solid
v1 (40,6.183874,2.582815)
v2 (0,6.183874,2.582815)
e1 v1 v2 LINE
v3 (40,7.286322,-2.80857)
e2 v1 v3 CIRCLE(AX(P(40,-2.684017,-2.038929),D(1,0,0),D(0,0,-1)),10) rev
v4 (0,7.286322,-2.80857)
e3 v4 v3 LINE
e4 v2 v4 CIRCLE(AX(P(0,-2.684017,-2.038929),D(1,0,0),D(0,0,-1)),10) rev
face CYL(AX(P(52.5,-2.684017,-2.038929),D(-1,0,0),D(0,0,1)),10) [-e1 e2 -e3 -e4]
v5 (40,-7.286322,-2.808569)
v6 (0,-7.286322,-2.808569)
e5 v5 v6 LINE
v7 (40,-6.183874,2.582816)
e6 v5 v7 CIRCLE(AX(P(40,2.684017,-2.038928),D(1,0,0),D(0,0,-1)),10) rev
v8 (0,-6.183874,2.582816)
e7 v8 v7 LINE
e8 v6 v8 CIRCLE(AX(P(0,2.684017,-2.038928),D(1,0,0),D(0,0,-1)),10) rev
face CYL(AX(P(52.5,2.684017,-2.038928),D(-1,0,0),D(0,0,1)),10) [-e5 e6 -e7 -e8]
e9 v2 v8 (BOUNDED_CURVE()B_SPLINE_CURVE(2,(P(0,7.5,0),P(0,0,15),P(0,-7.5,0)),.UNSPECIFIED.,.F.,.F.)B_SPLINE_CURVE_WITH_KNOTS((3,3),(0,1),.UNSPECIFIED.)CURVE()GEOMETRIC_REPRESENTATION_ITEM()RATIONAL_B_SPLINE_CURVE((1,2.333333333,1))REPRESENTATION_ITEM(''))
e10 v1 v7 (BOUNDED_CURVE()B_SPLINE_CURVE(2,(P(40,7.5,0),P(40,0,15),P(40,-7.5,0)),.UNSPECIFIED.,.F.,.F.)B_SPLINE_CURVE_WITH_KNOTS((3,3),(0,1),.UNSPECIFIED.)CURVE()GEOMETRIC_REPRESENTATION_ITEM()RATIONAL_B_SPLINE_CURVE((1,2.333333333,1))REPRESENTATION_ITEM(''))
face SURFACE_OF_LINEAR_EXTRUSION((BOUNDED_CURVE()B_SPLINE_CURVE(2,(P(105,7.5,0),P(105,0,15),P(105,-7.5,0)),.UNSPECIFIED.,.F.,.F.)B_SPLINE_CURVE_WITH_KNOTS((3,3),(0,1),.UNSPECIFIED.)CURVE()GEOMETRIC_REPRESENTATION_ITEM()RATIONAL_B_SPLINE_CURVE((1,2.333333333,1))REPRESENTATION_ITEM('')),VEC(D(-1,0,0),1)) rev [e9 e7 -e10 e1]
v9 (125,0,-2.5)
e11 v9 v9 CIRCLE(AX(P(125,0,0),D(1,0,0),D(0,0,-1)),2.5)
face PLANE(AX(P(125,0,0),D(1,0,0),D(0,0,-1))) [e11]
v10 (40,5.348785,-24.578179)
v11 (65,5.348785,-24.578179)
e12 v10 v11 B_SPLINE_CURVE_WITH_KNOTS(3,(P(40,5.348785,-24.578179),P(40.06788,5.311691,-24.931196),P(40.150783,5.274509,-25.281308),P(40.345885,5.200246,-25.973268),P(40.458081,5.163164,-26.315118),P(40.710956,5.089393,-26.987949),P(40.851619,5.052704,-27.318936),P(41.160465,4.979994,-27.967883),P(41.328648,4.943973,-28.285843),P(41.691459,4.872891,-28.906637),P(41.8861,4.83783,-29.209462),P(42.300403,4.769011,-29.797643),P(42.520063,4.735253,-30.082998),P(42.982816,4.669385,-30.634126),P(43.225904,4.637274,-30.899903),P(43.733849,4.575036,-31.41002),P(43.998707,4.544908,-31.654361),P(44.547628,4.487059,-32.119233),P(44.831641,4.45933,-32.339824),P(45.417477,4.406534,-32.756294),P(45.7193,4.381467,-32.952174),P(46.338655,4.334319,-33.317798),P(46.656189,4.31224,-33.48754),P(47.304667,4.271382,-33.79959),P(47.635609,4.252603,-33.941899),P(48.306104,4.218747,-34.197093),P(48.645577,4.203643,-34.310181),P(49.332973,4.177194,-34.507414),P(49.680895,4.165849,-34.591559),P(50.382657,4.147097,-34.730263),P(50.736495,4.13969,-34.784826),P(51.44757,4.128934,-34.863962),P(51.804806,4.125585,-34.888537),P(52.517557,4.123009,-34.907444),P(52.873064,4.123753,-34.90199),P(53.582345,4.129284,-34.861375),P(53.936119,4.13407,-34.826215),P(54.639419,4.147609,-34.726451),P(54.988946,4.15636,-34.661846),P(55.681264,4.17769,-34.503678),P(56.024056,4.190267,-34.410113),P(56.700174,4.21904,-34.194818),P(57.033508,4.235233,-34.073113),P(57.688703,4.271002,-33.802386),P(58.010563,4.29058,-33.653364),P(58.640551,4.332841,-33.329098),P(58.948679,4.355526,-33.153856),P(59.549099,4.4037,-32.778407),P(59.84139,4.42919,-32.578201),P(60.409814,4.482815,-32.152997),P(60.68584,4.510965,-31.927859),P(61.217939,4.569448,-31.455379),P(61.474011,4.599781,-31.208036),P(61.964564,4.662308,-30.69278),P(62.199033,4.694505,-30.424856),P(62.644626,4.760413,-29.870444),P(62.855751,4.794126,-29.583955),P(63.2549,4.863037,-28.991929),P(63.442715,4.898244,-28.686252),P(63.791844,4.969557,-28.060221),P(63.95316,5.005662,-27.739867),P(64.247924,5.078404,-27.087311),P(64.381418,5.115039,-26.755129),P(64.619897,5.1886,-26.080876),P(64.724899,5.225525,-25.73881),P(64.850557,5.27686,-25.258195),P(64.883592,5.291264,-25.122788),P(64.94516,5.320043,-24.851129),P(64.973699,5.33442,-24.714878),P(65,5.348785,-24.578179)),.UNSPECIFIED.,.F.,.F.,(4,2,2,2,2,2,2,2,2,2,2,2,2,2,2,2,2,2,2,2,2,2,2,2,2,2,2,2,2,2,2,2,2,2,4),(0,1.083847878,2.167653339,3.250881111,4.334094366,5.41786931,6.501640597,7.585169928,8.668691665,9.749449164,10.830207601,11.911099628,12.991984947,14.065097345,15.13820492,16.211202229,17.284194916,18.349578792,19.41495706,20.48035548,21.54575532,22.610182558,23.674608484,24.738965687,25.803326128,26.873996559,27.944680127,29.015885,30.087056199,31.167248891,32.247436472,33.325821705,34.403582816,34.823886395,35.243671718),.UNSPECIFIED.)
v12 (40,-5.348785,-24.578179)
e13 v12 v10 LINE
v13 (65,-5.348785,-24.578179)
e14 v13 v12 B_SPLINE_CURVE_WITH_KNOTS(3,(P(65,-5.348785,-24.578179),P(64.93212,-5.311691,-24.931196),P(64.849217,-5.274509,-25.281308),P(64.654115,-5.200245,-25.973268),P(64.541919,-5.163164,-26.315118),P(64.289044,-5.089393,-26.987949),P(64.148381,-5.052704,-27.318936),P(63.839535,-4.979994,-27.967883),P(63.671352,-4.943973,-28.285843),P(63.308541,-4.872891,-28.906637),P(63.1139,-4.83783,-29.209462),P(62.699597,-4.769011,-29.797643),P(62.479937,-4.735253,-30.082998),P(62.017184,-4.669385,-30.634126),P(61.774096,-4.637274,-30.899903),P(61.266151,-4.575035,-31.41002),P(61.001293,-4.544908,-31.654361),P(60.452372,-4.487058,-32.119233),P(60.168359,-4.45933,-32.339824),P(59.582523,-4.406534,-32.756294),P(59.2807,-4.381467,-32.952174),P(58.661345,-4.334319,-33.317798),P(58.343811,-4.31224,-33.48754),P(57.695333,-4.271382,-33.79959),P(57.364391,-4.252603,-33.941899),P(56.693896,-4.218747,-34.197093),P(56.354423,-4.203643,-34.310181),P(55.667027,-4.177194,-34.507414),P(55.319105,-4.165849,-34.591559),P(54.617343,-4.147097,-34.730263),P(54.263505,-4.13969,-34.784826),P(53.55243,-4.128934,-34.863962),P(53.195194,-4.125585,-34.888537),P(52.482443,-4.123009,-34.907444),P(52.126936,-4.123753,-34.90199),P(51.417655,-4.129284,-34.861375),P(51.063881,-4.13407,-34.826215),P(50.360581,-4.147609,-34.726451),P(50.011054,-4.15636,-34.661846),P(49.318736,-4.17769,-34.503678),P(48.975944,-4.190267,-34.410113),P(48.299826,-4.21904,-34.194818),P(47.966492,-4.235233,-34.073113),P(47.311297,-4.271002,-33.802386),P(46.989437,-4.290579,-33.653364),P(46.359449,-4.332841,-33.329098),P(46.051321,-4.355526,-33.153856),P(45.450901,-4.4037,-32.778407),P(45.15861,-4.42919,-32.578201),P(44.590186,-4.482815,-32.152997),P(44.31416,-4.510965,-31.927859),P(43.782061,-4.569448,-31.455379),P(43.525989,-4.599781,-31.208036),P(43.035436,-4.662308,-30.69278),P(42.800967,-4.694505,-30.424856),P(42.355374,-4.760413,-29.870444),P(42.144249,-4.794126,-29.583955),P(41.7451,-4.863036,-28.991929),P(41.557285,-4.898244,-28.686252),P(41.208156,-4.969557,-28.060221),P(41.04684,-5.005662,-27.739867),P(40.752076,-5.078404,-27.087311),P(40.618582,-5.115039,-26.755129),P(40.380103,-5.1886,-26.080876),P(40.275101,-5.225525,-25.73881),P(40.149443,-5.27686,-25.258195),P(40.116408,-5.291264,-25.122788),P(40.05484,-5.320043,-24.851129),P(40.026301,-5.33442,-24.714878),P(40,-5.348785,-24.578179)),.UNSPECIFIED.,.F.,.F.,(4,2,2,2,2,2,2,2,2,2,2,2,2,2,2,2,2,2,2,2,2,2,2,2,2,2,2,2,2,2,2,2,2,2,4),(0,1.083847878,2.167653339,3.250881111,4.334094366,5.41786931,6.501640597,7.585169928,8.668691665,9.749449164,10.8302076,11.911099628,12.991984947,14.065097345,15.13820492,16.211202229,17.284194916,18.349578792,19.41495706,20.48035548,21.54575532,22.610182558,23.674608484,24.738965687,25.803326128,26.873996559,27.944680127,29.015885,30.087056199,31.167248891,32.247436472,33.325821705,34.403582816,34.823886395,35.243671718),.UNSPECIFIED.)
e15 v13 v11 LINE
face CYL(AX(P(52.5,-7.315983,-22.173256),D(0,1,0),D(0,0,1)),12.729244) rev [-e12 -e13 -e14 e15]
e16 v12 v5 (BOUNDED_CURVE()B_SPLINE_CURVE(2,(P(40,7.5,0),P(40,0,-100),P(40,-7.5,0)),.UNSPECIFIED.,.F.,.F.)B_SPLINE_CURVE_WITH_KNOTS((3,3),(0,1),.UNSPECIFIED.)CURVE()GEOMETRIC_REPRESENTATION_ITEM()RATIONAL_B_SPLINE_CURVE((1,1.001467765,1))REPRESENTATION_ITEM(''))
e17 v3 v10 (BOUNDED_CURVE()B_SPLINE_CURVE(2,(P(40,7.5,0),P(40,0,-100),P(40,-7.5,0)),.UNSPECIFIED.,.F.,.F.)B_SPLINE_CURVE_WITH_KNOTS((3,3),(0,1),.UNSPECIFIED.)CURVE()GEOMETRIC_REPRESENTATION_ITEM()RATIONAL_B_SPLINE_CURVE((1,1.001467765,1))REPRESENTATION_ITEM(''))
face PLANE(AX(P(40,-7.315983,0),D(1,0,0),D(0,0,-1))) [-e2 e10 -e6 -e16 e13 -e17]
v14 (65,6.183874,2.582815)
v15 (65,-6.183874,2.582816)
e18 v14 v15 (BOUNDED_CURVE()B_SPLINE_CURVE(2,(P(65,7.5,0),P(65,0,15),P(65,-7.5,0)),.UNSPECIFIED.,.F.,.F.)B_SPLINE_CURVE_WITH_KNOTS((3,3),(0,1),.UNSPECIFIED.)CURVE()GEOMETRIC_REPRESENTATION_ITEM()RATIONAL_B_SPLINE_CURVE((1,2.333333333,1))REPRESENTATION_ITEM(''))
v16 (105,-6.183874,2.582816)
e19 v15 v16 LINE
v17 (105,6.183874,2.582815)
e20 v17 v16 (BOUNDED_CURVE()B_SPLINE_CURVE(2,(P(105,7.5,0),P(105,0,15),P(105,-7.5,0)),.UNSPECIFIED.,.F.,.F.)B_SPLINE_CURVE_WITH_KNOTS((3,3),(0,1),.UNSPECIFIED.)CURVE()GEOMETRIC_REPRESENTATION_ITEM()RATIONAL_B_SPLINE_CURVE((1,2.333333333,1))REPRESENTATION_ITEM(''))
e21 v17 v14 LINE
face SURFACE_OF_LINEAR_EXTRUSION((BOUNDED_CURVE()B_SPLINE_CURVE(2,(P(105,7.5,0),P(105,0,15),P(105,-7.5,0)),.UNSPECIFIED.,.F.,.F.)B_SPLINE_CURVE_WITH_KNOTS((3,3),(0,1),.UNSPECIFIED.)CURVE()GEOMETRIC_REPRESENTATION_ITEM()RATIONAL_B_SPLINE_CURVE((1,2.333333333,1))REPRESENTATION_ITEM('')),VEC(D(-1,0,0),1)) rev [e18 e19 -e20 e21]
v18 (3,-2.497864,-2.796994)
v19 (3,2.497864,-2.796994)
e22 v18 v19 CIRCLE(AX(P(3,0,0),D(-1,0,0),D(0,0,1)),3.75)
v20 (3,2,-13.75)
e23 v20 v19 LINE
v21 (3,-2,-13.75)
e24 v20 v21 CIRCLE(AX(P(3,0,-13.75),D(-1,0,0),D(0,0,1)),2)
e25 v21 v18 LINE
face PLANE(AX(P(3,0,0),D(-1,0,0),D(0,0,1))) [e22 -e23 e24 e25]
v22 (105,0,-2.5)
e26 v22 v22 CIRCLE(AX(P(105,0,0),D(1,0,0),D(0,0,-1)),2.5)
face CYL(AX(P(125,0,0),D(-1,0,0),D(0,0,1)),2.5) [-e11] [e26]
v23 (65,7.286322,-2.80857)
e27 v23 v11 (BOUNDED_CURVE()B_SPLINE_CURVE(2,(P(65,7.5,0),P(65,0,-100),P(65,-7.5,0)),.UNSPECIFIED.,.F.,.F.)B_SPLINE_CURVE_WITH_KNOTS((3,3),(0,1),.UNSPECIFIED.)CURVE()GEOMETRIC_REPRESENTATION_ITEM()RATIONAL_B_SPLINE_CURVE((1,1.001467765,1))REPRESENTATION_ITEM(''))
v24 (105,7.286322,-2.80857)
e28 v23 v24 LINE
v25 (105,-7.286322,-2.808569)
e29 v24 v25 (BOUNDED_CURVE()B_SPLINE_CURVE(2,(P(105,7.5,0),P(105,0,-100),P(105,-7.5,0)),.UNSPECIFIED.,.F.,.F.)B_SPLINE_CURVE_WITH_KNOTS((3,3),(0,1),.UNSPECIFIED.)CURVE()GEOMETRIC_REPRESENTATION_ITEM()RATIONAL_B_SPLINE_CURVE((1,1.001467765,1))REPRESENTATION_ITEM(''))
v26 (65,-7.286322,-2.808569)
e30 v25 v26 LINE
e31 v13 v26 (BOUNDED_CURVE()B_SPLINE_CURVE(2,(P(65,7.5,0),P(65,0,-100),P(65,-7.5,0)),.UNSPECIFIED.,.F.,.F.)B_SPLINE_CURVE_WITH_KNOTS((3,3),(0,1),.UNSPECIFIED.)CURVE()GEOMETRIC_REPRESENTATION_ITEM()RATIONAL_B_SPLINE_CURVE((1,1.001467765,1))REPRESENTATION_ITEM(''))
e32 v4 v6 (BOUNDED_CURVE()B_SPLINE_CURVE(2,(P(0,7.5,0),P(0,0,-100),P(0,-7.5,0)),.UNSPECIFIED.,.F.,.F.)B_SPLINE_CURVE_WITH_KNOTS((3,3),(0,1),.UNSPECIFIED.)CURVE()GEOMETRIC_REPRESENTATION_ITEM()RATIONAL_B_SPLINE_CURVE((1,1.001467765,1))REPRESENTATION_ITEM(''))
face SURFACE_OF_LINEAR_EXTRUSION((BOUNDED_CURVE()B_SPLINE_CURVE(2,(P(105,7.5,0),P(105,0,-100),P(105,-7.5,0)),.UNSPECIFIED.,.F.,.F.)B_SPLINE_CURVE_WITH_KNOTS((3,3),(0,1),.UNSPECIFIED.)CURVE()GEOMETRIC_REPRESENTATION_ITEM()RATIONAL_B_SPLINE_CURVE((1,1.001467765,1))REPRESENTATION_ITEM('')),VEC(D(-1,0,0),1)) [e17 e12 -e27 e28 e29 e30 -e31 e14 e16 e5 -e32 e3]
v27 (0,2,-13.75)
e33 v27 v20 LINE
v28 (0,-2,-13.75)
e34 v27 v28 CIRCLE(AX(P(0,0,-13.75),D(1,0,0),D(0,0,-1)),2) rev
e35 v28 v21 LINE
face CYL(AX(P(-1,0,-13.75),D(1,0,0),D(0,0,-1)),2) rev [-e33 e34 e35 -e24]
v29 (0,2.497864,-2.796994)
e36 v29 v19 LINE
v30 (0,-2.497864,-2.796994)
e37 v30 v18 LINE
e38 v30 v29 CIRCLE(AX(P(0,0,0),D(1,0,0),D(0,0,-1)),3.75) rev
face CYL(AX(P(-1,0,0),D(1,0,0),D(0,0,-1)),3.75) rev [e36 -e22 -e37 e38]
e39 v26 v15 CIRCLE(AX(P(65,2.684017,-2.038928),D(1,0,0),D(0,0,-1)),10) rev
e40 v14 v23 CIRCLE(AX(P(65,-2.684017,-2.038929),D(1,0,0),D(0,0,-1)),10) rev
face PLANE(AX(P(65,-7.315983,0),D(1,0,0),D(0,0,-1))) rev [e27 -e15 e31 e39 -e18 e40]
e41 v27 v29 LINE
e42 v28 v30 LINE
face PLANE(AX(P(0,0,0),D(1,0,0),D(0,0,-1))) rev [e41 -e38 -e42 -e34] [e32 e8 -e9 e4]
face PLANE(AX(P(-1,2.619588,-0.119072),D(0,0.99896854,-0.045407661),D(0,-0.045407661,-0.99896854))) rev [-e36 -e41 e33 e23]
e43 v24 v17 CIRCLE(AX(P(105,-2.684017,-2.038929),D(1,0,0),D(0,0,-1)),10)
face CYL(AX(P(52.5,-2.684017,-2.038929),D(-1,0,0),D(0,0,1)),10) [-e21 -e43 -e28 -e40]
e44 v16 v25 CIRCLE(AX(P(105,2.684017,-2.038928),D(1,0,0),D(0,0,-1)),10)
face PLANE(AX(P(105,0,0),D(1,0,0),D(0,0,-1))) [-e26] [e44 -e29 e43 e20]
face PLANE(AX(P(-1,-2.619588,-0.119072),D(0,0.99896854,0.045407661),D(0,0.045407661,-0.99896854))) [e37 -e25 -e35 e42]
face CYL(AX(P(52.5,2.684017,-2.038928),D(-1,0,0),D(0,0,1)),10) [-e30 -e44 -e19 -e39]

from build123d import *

# Parameters (mm, degrees)
SKETCH1_R               = 1.5
BOSS_EXTRUDE1_DEPTH     = 105
FILLET1_R               = 10
CUT_EXTRUDE1_DEPTH      = 117.542660484
CUT_EXTRUDE1_DEPTH_BACK = 117.542660484
CAVITY1_DEPTH           = 3
SKETCH3_R               = 2.5
SKETCH3_R_2             = 1.5
BOSS_EXTRUDE2_DEPTH     = 20
SKETCH5_R               = 1.5
BOSS_EXTRUDE4_DEPTH     = 37
BOSS_EXTRUDE5_START     = -62
SKETCH5_2_R             = 1.5
BOSS_EXTRUDE5_DEPTH     = 40


# Read off the part's stored shape, not the designer's step: Cavity1
with BuildPart() as part:
    # Sketch1 → Boss-Extrude1 (new body)
    with BuildSketch(Plane(origin=(0, 0, 0), x_dir=(0, 0, -1), z_dir=(1, 0, 0))):
        with BuildLine():
            add(Edge.make_bspline(
                [(3.73e-07, 7.5), (-15, 0), (-3.73e-07, -7.5)],
                knots=[0, 0, 0, 1, 1, 1], degree=2, weights=[1, 2.333333333, 1]))
            add(Edge.make_bspline(
                [(3.73e-07, 7.5), (100, 0), (-3.73e-07, -7.5)],
                knots=[0, 0, 0, 1, 1, 1], degree=2, weights=[1, 1.001467765, 1]))
        make_face()
        Circle(SKETCH1_R, mode=Mode.SUBTRACT)
    extrude(amount=BOSS_EXTRUDE1_DEPTH)

    # Fillet1
    fillet1_edges = [part.edges().sort_by_distance(p)[0] for p in [
        (52.5, -7.5, 3.73e-07),
        (52.5, 7.5, -3.73e-07),
    ]]
    fillet(fillet1_edges, radius=FILLET1_R)

    # Sketch2 → Cut-Extrude1 (cut, two sides: drawn at the far end of the back side and taken through both)
    with BuildSketch(Plane(origin=(0, 0, 0), x_dir=(1, 0, 0), z_dir=(0, 1, 0)).offset(-CUT_EXTRUDE1_DEPTH_BACK)):
        with BuildLine():
            Line((65, 19.76833361), (65, 24.578179161))
            ThreePointArc((65, 24.578179161), (52.5, 34.902500415), (40, 24.578179161))
            Line((40, 24.578179161), (40, 19.76833361))
            Line((40, 19.76833361), (40, 14.958488059))
            ThreePointArc((40, 14.958488059), (52.5, 4.634166805), (65, 14.958488059))
            Line((65, 14.958488059), (65, 19.76833361))
        make_face()
        with BuildLine():
            Line((40, -10.5), (65, -10.5))
            Line((65, -10.5), (65, 14.958488059))
            ThreePointArc((65, 14.958488059), (52.5, 4.634166805), (40, 14.958488059))
            Line((40, 14.958488059), (40, -10.5))
        make_face()
    extrude(amount=CUT_EXTRUDE1_DEPTH + CUT_EXTRUDE1_DEPTH_BACK, mode=Mode.SUBTRACT)

    # Cavity1 outline → Cavity1 (cut)
    with BuildSketch(Plane.YZ):
        with BuildLine():
            ThreePointArc((-2, -13.75), (0, -15.75), (2, -13.75))
            Line((2, -13.75), (2.497863905, -2.796994085))
            ThreePointArc((2.497863905, -2.796994085), (0, 3.75), (-2.497863905, -2.796994085))
            Line((-2.497863905, -2.796994085), (-2, -13.75))
        make_face()
    extrude(amount=CAVITY1_DEPTH, mode=Mode.SUBTRACT)

    # Sketch3 → Boss-Extrude2 (add)
    # profile 1 of 2: a face of its own
    with BuildSketch(Plane(origin=(105, 0, 0), x_dir=(0, 0, -1), z_dir=(1, 0, 0))):
        Circle(SKETCH3_R)
        with Locations(Location((0, 0, 0), (0, 0, 180))):
            Circle(SKETCH3_R_2, mode=Mode.SUBTRACT)
    # profile 2 of 2: a face of its own
    with BuildSketch(Plane(origin=(105, 0, 0), x_dir=(0, 0, -1), z_dir=(1, 0, 0))):
        with Locations(Location((0, 0, 0), (0, 0, 180))):
            Circle(SKETCH3_R_2)
    extrude(amount=BOSS_EXTRUDE2_DEPTH)

    # Sketch5 → Boss-Extrude4 (add)
    with BuildSketch(Plane.ZY.offset(-3)):
        with Locations(Location((0, 0, 0), (0, 0, 180))):
            Circle(SKETCH5_R)
    extrude(amount=-BOSS_EXTRUDE4_DEPTH)

    # Sketch5<2> → Boss-Extrude5 (add)
    with BuildSketch(Plane.ZY.offset(-3).offset(BOSS_EXTRUDE5_START)):
        Circle(SKETCH5_2_R)
    extrude(amount=-BOSS_EXTRUDE5_DEPTH)


solid = part.part
